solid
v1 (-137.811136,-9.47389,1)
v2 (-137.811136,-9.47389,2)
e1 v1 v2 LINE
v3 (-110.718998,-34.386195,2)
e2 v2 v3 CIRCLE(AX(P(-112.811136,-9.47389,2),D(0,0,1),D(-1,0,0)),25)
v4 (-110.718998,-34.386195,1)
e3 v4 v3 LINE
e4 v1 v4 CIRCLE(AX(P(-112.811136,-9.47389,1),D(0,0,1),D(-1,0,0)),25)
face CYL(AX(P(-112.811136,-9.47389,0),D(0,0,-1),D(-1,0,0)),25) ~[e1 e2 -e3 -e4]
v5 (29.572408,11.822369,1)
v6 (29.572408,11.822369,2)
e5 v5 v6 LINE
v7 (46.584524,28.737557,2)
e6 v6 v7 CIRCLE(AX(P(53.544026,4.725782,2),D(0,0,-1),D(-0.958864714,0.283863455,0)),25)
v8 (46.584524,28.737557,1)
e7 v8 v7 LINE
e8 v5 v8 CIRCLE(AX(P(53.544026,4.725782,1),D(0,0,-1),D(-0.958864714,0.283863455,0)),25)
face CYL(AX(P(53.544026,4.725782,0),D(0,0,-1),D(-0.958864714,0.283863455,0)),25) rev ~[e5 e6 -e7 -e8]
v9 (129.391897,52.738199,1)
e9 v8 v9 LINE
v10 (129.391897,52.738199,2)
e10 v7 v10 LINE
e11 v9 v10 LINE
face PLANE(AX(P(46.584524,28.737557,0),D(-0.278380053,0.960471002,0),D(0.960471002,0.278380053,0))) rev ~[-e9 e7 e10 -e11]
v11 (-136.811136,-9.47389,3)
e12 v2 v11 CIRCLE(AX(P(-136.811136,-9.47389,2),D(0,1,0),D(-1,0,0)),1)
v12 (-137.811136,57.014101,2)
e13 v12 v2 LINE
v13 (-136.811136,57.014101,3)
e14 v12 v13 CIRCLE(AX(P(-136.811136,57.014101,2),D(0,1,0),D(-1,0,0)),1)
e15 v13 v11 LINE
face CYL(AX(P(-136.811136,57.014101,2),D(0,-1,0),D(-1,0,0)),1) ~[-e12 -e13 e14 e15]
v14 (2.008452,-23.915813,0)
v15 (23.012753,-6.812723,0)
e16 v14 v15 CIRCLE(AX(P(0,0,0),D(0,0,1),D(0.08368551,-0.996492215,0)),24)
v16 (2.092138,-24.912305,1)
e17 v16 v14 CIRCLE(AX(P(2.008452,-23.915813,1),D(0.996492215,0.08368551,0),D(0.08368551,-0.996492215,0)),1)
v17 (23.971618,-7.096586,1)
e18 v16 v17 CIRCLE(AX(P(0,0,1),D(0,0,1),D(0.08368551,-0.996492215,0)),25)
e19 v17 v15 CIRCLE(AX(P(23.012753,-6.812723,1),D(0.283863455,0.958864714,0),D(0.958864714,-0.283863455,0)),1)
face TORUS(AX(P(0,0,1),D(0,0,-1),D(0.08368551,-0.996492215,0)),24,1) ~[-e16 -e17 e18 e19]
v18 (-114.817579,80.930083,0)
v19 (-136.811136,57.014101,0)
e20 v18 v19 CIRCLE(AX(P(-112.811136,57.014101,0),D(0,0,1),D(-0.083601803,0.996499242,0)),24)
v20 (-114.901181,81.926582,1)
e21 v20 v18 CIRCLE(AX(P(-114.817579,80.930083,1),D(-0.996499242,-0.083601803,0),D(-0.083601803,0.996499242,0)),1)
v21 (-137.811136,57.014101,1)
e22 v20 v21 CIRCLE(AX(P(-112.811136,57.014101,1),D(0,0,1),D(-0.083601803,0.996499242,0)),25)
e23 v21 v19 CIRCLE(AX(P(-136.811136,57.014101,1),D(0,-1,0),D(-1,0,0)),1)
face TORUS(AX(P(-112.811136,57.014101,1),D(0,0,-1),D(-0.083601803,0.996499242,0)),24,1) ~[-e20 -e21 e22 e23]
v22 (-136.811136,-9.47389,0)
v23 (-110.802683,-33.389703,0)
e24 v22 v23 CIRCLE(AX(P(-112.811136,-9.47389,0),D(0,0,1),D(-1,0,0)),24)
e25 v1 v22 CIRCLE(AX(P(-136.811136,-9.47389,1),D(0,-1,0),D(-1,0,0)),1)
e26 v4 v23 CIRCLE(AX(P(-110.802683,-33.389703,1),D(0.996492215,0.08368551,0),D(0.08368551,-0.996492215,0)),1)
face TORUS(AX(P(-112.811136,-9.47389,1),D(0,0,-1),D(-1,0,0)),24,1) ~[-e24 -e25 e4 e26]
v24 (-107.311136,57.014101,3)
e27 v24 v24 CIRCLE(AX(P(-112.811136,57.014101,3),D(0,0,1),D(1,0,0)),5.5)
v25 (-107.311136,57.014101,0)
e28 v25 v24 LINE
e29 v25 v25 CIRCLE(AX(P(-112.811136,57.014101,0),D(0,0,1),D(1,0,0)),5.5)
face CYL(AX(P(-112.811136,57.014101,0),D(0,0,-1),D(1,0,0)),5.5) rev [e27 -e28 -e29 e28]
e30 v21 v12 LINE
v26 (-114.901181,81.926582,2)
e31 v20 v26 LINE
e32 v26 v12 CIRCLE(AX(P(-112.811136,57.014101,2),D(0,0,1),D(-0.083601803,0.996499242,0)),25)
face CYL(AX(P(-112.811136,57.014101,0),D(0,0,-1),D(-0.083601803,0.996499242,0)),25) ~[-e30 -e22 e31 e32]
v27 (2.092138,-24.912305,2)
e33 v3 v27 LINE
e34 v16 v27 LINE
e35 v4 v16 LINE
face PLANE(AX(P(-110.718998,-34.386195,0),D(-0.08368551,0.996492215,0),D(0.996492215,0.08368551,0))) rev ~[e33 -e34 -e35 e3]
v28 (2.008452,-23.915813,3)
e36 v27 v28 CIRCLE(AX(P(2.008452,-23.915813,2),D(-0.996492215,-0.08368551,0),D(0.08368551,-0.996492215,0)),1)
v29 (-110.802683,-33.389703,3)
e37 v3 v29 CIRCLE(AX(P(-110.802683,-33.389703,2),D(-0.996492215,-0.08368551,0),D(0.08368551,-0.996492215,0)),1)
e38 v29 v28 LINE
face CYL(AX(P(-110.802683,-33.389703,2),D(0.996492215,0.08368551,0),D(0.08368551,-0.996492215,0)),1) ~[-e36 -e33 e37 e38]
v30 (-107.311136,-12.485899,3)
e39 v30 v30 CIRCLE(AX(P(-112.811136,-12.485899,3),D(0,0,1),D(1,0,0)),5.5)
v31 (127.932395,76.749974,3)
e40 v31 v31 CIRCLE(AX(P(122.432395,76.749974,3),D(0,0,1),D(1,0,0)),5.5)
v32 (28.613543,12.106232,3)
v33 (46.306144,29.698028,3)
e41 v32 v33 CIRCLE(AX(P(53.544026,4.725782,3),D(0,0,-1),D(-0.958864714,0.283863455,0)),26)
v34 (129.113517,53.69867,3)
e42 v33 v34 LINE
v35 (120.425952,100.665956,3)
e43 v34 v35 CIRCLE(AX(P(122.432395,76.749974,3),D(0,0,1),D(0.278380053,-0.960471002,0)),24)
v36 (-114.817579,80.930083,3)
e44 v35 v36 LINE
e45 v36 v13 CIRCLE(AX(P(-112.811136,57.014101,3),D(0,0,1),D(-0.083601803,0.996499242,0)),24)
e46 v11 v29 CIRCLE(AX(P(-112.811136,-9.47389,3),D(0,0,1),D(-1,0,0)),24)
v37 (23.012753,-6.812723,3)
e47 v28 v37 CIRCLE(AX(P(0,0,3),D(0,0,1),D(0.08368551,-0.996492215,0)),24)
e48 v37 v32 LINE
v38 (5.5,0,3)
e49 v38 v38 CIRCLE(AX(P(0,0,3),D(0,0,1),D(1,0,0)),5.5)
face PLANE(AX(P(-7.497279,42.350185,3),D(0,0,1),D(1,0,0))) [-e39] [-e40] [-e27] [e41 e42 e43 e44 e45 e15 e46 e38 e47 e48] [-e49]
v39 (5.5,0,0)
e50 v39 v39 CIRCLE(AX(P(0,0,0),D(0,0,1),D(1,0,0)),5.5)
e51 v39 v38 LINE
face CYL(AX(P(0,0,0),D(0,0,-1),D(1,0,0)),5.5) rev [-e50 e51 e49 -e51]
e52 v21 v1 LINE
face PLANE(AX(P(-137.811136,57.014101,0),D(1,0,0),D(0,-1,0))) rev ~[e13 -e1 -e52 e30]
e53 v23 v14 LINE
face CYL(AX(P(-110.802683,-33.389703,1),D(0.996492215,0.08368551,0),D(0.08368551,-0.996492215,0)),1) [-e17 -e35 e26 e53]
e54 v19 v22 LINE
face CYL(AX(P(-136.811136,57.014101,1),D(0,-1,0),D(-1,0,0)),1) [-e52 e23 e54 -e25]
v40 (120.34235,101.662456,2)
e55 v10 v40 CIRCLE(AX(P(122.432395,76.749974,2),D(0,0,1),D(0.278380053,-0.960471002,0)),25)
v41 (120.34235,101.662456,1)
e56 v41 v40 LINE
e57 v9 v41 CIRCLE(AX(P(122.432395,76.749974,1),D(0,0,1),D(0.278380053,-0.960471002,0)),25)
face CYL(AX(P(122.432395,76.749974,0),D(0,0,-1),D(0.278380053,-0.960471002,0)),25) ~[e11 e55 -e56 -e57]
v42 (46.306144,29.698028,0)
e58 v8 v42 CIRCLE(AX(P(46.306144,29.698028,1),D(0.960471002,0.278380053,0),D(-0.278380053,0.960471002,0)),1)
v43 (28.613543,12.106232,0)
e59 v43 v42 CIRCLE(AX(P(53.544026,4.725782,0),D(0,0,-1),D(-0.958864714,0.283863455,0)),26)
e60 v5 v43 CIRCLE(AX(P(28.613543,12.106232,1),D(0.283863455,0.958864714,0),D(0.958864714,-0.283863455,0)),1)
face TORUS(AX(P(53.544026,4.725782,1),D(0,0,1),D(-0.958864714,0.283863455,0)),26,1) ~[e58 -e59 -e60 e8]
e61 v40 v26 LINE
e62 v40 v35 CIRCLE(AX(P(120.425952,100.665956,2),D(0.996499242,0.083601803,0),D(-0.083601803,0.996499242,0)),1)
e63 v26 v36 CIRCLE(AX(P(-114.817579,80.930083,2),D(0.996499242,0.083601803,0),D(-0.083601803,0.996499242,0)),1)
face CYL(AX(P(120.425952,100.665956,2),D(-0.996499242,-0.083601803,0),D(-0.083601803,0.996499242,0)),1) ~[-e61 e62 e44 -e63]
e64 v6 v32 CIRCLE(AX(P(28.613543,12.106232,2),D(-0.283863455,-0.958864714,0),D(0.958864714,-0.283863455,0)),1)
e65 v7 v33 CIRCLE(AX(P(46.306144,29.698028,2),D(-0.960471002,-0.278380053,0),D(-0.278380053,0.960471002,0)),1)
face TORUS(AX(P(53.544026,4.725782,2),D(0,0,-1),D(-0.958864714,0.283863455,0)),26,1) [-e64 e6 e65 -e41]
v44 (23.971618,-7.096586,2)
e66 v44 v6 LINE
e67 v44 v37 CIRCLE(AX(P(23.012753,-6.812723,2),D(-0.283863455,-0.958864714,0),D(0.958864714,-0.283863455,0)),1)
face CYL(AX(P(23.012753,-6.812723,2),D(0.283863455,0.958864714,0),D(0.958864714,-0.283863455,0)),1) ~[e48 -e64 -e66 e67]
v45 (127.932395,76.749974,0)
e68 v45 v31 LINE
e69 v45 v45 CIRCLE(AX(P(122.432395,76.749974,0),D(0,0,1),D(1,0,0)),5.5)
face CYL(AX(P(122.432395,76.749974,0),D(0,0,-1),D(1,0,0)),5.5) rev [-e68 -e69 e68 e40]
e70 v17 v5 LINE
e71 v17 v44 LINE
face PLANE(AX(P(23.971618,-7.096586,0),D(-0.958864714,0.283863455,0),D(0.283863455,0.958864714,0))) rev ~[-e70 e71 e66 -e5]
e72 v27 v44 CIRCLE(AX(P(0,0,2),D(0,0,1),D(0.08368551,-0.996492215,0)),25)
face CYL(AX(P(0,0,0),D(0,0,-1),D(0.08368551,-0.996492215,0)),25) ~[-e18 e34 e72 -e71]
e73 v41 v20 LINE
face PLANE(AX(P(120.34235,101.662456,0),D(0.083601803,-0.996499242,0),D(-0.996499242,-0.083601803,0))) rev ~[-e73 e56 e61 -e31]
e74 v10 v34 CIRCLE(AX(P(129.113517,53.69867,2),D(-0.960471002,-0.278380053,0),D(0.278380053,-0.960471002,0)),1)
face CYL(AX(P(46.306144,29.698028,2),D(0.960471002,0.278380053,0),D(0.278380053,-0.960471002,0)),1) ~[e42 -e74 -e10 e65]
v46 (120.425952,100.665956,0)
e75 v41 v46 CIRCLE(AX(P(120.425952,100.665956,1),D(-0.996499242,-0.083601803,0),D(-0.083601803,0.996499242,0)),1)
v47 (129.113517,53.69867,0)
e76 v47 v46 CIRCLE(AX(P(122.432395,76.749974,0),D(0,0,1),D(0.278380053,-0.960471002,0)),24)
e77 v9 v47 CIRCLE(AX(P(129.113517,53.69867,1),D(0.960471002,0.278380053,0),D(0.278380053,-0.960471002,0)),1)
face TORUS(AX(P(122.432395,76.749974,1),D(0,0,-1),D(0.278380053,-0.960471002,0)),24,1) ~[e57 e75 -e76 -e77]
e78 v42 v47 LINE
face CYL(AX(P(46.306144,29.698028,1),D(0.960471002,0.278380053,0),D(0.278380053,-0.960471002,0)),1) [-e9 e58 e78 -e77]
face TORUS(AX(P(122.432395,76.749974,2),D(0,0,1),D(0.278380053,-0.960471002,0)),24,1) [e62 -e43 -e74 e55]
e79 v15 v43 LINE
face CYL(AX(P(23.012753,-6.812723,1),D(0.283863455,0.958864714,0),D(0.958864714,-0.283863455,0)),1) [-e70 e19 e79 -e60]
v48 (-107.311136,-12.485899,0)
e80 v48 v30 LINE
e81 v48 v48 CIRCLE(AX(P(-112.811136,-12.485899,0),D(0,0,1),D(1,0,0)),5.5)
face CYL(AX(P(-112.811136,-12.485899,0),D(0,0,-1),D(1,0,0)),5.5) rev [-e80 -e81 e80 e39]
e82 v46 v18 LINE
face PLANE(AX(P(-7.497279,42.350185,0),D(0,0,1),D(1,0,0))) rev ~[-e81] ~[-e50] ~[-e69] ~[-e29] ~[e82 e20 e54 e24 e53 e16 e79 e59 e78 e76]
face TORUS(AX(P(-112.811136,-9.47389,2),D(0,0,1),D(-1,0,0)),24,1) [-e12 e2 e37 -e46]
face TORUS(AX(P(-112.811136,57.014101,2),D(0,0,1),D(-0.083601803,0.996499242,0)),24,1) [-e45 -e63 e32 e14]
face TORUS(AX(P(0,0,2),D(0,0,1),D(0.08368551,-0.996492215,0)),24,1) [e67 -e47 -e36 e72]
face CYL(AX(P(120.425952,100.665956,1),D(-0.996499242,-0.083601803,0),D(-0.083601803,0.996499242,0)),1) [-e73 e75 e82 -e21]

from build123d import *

# Parameters (mm, degrees)
F0_R     = 5.5
F1_DEPTH = 3
F2_R     = 1


# Not quite as in the source:
# - a feature names something its author has since deleted; it is built from what else it names


with BuildPart() as f1:
    # F0 (on Top) → F1 (new body)
    with BuildSketch(Plane.XY):
        with BuildLine():
            ThreePointArc((-114.9011806829, 81.9265817605), (-131.2129171427, 73.936702076), (-137.8111356168, 57.0141007194))
            Line((-137.8111356168, 57.0141007194), (-137.8111356168, -9.4738897749))
            ThreePointArc((-137.8111356168, -9.4738897749), (-129.7329640684, -27.8763820478), (-110.7189978684, -34.3861951608))
            Line((-110.7189978684, -34.3861951608), (2.0921377484, -24.9123053859))
            ThreePointArc((2.0921377484, -24.9123053859), (15.7854299835, -19.3860826429), (23.9716178382, -7.0965863779))
            Line((23.9716178382, -7.0965863779), (29.5724079217, 11.8223687823))
            ThreePointArc((29.5724079217, 11.8223687823), (35.9169319793, 22.4538833983), (46.5845244365, 28.7375574602))
            Line((46.5845244365, 28.7375574602), (129.3918966116, 52.7381994328))
            ThreePointArc((129.3918966116, 52.7381994328), (147.0153896078, 81.2971043835), (120.3423502221, 101.6624555296))
            Line((120.3423502221, 101.6624555296), (-114.9011806829, 81.9265817605))
        make_face()
        with Locations((-112.8111356168, -12.4858992806)):
            Circle(F0_R, mode=Mode.SUBTRACT)
        Circle(F0_R, mode=Mode.SUBTRACT)
        with Locations((-112.8111356168, 57.0141007194)):
            Circle(F0_R, mode=Mode.SUBTRACT)
        with Locations((122.4323952882, 76.7499744885)):
            Circle(F0_R, mode=Mode.SUBTRACT)
    extrude(amount=F1_DEPTH)

    # F2
    f2_edges = [f1.edges().sort_by_distance(p)[0] for p in [
        (2.720585, 91.794519, 0),
        (147.01539, 81.297104, 0),
        (87.988211, 40.737878, 0),
        (-137.811136, 23.770105, 0),
        (-137.811136, 23.770105, 3),
        (-131.212917, 73.936702, 0),
        (-131.212917, 73.936702, 3),
        (2.720585, 91.794519, 3),
        (147.01539, 81.297104, 3),
        (87.988211, 40.737878, 3),
    ]]
    fillet(f2_edges, radius=F2_R)


solid = f1.part
